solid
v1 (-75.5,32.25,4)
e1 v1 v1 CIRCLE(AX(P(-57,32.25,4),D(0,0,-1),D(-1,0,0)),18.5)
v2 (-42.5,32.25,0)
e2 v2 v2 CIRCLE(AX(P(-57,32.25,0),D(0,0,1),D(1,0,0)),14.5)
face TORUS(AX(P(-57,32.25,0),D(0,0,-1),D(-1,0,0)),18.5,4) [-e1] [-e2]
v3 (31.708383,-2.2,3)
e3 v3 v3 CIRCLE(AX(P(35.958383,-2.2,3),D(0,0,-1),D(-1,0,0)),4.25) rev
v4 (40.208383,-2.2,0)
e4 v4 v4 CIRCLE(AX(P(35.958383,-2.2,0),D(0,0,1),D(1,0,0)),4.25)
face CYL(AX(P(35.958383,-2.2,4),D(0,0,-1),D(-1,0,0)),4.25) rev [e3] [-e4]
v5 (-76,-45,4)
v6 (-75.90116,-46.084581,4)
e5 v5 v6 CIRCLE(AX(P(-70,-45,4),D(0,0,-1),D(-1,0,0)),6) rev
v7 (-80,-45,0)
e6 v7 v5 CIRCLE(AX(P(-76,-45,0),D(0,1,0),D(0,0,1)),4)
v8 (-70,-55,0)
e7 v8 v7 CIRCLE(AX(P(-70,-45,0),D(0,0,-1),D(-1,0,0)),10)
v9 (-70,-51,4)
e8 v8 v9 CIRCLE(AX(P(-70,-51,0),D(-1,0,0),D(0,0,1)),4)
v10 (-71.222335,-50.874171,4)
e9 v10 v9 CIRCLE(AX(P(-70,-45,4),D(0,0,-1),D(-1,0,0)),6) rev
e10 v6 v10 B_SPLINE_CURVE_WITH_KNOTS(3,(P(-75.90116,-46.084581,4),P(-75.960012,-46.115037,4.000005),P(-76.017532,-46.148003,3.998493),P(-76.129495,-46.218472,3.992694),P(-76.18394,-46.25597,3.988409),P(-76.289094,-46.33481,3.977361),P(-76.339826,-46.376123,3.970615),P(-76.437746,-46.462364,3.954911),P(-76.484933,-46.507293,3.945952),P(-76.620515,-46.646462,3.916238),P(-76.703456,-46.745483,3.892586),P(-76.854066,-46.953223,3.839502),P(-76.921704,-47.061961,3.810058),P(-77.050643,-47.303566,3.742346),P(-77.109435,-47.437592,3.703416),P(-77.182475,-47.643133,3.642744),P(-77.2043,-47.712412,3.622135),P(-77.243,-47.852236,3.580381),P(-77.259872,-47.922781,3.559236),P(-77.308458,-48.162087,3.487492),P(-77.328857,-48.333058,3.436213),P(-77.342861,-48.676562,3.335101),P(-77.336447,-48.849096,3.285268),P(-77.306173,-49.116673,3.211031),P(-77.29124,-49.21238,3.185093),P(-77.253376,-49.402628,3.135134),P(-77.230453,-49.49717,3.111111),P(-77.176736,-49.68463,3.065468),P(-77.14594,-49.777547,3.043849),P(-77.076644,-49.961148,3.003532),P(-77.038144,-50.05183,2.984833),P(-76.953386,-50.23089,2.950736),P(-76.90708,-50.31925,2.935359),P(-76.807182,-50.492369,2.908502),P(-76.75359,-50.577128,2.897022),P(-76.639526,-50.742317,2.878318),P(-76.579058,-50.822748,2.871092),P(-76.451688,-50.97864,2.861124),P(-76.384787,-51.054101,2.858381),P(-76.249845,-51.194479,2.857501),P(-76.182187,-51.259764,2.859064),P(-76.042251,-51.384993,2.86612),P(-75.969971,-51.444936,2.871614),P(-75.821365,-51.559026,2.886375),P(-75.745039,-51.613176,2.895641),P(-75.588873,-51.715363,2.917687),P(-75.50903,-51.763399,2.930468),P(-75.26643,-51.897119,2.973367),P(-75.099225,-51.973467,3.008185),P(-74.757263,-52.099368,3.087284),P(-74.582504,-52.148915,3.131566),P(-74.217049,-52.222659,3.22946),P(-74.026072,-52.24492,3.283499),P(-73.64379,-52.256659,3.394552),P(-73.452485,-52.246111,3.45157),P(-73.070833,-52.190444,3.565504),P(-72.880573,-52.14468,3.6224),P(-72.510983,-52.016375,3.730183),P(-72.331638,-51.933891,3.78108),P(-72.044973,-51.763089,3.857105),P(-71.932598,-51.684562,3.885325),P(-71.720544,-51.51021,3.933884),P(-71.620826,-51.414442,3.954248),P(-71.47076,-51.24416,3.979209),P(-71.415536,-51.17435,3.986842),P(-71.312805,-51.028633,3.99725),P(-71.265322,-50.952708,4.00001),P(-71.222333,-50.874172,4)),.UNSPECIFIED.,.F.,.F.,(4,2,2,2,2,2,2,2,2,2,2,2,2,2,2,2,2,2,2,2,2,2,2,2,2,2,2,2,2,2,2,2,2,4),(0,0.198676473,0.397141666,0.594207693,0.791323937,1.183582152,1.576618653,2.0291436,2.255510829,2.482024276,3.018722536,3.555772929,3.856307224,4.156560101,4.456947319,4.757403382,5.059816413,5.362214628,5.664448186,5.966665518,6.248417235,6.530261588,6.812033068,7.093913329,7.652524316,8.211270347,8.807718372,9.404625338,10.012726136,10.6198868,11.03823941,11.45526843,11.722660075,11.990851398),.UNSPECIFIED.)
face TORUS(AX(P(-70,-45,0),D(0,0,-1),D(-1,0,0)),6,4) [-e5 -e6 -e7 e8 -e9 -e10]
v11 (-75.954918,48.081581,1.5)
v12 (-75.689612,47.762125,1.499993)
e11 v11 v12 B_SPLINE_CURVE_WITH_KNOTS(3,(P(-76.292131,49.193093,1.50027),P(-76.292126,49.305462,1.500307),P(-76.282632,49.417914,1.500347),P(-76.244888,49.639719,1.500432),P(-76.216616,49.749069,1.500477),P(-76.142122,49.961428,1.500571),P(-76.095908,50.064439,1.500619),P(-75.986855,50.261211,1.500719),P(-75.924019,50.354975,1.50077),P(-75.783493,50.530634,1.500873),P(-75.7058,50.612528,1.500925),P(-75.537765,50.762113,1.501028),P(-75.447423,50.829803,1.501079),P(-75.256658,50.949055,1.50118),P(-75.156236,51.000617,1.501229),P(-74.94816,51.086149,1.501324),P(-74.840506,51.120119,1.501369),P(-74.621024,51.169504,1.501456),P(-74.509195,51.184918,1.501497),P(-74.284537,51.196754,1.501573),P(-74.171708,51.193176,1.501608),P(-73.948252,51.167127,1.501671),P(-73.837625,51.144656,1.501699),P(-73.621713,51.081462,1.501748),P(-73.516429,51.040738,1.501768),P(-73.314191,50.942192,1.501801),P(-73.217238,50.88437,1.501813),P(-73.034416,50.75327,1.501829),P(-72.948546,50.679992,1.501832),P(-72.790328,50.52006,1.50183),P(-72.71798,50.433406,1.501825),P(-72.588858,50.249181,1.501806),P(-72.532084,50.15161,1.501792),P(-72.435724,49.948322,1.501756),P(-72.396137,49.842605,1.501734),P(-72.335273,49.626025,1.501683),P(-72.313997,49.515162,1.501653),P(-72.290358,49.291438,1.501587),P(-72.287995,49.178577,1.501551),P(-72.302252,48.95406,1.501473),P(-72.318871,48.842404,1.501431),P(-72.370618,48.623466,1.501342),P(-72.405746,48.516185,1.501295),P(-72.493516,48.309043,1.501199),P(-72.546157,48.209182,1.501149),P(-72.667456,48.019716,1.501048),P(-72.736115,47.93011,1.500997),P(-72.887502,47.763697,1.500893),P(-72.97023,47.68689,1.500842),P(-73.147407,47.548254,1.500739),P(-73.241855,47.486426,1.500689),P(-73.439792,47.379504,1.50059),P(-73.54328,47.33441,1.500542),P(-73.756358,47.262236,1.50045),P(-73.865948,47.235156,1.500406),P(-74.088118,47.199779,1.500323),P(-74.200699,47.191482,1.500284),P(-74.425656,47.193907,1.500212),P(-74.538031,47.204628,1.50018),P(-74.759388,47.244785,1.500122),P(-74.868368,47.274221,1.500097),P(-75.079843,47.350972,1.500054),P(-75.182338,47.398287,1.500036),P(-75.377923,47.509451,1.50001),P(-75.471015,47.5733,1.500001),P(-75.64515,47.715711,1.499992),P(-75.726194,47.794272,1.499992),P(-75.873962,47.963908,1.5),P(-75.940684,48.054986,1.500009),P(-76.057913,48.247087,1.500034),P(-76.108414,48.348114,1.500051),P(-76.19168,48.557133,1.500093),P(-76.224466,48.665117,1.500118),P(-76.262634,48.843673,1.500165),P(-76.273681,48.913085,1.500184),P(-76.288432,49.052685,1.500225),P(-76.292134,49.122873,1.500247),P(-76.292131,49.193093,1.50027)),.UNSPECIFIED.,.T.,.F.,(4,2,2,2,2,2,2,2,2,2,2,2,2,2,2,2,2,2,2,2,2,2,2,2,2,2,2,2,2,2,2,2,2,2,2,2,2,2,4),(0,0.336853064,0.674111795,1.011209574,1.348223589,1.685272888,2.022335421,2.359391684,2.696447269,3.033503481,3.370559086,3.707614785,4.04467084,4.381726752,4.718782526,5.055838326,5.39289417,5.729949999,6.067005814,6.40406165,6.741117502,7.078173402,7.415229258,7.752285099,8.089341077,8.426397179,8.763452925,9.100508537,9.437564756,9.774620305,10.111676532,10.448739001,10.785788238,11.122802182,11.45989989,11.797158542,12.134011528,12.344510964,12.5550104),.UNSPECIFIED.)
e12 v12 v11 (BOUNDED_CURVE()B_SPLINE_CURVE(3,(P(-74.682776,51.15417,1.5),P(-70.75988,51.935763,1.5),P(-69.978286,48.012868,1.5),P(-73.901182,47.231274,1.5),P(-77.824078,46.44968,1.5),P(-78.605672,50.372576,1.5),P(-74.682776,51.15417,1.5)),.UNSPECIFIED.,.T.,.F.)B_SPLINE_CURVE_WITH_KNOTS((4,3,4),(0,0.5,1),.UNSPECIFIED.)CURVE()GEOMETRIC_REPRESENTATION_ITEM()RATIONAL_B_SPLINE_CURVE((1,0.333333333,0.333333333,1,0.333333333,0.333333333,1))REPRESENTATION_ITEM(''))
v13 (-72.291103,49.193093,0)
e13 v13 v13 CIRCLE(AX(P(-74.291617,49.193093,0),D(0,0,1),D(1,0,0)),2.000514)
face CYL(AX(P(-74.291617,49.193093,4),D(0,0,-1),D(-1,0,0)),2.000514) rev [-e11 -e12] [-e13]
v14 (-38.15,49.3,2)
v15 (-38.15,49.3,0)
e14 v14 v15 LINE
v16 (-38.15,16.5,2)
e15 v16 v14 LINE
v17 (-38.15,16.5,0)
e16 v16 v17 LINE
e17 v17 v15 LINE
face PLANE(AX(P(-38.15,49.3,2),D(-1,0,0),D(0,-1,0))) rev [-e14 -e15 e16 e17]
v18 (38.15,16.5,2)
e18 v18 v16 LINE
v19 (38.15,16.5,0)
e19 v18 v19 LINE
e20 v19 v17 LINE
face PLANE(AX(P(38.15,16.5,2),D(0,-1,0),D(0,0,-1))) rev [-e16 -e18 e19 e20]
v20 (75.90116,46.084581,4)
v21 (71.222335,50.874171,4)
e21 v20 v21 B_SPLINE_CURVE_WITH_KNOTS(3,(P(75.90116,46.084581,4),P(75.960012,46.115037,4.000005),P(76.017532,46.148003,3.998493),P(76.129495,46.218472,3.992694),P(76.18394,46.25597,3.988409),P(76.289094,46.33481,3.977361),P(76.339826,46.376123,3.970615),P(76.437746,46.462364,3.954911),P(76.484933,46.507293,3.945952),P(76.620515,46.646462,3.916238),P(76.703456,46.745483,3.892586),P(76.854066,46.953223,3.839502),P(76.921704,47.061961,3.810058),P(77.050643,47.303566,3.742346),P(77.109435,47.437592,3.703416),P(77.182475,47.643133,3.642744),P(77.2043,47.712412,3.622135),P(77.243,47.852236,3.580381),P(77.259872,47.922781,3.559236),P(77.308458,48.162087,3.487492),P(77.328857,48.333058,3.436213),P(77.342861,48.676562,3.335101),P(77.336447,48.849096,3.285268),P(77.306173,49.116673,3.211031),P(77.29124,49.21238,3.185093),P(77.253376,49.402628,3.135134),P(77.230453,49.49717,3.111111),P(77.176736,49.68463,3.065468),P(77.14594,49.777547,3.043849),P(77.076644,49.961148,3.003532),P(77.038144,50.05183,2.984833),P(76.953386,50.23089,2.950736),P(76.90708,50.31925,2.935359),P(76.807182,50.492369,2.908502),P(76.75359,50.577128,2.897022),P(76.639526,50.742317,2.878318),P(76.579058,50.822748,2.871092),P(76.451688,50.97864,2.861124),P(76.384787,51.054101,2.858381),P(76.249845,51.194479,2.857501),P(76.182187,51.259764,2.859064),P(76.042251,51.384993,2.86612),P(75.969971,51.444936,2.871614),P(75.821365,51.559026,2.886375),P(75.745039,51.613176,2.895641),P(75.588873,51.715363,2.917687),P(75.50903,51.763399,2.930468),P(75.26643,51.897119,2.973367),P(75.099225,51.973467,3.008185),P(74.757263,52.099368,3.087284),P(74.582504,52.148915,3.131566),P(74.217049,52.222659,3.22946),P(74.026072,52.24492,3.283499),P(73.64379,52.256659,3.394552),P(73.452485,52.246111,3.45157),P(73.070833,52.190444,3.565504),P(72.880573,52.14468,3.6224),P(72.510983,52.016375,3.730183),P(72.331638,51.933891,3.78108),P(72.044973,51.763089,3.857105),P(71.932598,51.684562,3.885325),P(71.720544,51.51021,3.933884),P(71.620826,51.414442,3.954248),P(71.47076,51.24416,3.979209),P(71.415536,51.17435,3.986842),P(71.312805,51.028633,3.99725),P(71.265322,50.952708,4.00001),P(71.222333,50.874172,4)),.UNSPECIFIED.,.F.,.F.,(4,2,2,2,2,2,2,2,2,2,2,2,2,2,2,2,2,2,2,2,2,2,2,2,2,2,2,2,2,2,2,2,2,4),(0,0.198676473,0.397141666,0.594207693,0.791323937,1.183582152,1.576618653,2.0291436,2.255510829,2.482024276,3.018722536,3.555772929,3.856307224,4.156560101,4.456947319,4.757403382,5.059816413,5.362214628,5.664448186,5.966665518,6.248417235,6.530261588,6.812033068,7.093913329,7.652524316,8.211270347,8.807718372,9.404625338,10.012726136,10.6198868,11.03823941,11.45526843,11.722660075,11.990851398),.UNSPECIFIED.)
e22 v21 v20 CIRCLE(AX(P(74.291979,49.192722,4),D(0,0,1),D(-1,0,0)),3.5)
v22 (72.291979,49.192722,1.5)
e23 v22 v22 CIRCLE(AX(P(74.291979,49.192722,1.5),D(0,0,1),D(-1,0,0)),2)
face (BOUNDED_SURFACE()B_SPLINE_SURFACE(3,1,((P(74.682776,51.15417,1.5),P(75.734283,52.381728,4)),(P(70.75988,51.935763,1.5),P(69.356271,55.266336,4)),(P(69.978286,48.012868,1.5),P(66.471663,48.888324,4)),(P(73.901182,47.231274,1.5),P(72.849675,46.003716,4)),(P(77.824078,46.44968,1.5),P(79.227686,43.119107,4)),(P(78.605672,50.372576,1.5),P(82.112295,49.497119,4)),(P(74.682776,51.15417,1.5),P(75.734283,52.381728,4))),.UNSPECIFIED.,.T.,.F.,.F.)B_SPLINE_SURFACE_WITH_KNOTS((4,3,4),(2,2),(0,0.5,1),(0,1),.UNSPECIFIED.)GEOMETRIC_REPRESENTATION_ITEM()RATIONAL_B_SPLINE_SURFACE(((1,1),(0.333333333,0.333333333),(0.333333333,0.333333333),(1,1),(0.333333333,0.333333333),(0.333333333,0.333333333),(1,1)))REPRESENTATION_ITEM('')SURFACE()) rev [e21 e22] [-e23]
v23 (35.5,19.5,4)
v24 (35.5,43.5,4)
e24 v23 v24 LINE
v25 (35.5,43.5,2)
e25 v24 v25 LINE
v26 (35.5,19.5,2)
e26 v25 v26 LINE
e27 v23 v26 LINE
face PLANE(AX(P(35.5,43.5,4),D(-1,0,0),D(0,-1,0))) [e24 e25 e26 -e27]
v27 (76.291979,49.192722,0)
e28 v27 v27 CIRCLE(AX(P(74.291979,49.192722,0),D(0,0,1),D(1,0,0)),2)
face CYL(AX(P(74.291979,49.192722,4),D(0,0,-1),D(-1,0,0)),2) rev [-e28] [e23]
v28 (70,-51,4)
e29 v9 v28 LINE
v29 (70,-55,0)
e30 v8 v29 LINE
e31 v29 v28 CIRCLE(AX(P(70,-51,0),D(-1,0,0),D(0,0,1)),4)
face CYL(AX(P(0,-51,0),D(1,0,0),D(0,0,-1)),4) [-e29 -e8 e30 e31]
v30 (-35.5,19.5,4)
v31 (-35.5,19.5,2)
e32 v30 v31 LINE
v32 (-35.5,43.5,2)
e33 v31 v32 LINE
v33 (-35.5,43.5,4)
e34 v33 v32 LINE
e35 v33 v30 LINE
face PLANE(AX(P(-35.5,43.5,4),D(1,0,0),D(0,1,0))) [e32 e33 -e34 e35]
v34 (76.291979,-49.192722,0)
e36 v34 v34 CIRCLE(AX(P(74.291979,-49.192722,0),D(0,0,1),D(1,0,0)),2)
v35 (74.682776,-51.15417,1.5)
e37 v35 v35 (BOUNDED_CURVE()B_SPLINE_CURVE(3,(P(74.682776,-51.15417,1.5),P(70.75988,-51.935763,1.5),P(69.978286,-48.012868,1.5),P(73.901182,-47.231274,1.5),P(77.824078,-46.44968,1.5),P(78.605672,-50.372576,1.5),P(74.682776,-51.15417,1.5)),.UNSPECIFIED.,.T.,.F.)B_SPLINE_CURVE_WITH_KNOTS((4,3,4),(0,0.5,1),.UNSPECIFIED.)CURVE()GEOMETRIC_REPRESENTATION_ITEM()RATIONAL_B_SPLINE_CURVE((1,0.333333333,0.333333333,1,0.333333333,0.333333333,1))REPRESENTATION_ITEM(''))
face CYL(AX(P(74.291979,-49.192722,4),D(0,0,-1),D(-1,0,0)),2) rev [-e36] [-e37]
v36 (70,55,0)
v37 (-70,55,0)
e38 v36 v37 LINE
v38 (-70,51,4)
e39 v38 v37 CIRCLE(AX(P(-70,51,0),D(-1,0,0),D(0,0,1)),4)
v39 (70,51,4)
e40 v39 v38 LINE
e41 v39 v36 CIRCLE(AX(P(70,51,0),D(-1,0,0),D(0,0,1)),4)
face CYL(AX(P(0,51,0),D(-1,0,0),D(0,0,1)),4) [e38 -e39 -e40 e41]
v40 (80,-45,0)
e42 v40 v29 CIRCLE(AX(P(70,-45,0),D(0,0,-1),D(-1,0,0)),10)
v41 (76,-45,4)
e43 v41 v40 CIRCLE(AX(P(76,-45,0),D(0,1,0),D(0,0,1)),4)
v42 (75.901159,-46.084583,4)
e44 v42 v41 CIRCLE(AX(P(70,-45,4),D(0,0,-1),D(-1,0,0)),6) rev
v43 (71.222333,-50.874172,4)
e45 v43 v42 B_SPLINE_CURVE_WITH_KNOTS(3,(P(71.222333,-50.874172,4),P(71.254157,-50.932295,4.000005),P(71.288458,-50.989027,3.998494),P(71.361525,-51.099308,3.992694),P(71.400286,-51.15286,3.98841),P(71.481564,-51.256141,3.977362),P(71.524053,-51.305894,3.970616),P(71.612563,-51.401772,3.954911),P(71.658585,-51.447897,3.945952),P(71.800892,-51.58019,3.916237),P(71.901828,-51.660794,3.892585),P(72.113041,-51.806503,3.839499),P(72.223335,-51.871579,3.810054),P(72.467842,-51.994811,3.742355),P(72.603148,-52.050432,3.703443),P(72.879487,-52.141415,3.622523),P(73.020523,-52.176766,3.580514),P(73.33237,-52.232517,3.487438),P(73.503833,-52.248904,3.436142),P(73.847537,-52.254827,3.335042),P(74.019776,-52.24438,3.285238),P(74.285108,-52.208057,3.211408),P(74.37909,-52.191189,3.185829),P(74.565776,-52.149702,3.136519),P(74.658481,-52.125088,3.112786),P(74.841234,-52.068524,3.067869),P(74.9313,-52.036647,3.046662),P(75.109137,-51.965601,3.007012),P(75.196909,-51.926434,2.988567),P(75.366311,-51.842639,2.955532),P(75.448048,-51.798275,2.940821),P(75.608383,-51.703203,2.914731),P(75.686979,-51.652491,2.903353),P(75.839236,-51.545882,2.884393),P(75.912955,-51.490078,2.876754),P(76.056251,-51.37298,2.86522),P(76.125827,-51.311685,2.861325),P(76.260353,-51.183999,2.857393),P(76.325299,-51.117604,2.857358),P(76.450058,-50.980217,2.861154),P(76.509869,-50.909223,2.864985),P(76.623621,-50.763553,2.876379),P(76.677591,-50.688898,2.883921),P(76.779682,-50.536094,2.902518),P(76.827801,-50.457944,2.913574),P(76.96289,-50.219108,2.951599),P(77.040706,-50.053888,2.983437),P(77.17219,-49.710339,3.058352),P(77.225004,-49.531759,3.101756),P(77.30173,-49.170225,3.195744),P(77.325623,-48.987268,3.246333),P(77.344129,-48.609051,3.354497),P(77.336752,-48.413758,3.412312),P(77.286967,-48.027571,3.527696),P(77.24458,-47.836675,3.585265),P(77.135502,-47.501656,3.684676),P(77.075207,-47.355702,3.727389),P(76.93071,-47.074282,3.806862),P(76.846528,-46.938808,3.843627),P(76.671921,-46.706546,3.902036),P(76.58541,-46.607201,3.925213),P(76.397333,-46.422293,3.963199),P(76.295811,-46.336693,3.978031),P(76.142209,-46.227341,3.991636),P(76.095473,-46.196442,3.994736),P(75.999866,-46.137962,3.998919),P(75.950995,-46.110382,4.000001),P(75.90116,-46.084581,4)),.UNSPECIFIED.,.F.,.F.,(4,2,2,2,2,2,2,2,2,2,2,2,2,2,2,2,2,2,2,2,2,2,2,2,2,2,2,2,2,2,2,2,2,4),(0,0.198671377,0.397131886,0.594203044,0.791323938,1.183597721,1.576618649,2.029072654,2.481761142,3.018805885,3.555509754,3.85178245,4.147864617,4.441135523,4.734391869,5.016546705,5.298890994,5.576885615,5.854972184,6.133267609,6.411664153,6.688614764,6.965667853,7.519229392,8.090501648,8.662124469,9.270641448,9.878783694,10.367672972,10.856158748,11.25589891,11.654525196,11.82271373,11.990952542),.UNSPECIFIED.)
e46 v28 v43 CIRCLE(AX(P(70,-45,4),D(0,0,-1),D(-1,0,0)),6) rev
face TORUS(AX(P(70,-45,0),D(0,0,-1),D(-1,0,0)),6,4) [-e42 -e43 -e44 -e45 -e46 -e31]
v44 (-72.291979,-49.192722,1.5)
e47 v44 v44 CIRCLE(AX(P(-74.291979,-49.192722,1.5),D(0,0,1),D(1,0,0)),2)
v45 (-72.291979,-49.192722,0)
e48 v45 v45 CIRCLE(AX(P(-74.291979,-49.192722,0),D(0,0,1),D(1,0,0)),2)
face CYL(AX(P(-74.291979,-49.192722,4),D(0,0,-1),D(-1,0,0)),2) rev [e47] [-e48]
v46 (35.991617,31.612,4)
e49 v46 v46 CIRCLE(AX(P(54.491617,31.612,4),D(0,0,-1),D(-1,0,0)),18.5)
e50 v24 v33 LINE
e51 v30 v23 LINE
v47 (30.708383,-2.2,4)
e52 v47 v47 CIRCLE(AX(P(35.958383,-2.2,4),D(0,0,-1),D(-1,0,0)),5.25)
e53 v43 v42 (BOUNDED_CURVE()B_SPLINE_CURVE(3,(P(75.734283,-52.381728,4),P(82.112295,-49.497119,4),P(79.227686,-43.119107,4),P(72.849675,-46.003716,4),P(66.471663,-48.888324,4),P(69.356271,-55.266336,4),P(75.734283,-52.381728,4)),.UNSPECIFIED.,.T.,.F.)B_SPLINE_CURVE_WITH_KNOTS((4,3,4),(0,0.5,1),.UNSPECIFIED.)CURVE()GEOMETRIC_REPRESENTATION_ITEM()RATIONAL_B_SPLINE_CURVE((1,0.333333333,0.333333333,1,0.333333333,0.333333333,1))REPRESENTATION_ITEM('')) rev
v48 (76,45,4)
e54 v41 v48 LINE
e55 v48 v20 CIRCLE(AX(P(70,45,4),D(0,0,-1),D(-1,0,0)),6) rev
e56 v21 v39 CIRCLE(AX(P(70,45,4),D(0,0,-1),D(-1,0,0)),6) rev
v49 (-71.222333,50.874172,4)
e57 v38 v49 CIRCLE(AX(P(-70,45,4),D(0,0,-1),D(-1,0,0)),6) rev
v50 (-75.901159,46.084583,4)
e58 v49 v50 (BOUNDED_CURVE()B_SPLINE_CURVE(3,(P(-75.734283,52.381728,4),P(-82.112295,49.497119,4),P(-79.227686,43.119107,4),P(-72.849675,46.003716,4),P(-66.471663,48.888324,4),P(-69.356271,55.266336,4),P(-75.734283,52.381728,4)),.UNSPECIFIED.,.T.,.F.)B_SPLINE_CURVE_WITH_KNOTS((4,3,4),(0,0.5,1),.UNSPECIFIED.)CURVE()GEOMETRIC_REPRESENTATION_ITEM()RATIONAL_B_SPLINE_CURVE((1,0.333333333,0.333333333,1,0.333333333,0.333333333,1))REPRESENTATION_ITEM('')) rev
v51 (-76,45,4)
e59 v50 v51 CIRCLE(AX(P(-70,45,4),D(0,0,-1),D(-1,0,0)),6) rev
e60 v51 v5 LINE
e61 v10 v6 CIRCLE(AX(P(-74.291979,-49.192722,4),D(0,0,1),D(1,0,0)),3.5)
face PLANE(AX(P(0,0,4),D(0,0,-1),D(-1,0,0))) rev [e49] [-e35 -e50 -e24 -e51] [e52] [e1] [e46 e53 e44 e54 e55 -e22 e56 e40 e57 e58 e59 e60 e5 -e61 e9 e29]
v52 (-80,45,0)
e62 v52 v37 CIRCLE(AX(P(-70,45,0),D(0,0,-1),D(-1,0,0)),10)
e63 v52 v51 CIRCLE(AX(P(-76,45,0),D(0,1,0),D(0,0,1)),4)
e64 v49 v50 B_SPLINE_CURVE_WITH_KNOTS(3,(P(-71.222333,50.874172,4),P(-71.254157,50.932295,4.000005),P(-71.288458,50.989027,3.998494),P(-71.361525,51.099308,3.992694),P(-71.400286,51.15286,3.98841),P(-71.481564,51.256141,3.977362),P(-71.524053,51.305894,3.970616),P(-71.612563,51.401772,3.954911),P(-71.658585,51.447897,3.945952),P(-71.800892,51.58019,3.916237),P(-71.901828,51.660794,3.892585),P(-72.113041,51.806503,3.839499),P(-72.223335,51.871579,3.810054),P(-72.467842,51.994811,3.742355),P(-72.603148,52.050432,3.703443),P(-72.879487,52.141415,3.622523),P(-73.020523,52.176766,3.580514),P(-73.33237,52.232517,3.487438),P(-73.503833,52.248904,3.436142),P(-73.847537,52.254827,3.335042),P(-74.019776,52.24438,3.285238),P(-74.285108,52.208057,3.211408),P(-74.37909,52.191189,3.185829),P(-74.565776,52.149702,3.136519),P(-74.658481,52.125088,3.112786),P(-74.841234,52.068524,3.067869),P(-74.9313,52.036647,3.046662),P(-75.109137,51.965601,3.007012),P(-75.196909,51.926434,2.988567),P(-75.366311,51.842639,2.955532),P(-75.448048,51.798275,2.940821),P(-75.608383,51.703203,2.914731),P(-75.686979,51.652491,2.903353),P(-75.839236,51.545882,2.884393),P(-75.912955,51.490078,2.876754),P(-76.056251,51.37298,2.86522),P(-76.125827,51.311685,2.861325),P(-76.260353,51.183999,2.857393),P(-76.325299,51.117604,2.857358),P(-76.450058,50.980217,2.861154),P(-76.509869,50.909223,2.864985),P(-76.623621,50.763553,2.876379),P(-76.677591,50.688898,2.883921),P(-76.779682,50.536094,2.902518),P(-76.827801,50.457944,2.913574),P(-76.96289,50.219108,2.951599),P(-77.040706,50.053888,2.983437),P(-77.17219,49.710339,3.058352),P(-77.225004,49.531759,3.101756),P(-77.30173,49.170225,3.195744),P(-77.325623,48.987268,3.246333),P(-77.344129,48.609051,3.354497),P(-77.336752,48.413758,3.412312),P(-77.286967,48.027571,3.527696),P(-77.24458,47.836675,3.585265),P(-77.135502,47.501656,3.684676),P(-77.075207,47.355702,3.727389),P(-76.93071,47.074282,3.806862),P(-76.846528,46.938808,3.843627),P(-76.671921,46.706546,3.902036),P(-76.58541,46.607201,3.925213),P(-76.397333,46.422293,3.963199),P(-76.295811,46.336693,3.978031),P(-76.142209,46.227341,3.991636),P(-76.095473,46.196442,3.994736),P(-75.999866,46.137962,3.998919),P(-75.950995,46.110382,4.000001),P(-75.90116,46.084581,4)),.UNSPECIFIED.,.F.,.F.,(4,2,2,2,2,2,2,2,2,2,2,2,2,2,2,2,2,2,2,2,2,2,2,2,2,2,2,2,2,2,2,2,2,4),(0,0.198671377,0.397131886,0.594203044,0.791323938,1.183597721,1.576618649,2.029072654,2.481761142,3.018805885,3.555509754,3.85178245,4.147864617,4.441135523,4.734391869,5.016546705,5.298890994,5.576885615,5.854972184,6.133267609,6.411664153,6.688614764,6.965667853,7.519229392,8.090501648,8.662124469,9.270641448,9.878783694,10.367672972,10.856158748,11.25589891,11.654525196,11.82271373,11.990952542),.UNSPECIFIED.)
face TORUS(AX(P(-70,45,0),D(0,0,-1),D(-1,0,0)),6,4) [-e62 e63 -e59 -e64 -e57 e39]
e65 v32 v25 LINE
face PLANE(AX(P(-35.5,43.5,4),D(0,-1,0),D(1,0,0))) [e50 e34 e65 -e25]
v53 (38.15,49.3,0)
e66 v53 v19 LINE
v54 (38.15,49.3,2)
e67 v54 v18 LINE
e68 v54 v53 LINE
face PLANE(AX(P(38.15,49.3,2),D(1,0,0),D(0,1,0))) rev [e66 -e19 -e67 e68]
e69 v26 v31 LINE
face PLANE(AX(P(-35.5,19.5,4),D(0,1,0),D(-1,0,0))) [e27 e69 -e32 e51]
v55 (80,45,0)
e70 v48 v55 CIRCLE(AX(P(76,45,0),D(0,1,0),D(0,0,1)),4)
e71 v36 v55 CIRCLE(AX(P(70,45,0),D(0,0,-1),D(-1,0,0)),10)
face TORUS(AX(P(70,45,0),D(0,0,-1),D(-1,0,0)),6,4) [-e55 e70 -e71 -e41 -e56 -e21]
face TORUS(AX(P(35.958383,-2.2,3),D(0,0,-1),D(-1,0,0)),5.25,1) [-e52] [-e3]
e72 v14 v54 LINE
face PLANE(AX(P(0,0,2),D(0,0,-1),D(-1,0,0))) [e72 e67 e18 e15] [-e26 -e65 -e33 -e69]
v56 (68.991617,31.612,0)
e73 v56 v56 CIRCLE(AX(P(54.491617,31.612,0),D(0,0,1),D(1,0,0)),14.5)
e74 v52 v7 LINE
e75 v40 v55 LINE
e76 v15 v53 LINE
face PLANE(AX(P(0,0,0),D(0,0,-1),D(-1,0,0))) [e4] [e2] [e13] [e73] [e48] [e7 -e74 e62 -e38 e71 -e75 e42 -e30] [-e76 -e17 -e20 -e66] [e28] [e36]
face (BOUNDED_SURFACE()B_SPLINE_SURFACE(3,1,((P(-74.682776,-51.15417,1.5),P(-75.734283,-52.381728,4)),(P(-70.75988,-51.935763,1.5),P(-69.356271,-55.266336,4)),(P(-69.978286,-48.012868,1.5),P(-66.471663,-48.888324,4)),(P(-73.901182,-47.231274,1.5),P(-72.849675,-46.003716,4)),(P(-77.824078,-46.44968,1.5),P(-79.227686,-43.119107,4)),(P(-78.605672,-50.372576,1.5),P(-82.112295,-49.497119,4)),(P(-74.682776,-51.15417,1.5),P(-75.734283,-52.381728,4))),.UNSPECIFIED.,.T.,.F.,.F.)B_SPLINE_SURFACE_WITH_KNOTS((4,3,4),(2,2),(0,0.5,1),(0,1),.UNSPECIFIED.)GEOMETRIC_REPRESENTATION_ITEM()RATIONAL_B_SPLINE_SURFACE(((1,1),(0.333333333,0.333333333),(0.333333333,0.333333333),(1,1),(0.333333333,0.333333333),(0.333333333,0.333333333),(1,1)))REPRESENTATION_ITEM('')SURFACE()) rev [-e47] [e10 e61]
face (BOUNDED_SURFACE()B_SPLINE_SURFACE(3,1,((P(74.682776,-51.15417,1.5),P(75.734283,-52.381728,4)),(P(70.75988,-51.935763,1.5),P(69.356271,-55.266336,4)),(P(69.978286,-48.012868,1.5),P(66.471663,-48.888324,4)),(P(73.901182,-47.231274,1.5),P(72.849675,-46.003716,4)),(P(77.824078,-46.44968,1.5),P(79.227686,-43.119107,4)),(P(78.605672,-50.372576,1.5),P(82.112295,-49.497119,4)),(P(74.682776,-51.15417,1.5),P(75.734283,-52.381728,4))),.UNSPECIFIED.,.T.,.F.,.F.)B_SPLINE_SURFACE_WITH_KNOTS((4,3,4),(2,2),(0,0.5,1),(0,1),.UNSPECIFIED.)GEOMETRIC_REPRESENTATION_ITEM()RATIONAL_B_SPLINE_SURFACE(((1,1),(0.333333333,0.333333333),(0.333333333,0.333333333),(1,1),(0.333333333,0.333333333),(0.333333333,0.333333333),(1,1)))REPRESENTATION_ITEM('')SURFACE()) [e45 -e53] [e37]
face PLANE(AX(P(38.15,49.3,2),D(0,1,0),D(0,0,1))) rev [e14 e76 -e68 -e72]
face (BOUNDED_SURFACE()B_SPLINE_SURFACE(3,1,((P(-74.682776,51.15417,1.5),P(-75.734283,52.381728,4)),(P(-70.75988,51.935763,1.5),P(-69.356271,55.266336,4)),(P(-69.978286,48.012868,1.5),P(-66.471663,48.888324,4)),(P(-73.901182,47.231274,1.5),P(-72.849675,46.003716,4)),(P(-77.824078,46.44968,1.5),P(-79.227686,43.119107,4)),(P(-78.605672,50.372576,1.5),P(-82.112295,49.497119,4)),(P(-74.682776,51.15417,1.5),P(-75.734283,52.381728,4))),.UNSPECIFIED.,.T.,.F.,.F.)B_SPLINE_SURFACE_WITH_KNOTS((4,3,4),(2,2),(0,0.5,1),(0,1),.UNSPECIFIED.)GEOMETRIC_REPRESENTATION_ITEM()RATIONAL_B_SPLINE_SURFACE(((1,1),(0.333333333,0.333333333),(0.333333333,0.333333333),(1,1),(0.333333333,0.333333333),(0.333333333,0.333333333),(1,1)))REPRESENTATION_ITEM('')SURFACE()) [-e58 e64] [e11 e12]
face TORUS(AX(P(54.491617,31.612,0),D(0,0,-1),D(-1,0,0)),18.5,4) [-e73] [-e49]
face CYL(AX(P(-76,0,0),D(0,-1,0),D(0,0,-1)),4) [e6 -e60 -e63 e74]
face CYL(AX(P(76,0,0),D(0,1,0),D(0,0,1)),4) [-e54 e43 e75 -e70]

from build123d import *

# Parameters (mm, degrees)
IZIM1_W                     = 160
IZIM1_H                     = 110
IZIM1_R                     = 14.5
IZIM1_R_2                   = 4.25
IZIM1_R_3                   = 2
IZIM1_R_4                   = 2.000514333
IZIM1_W_2                   = 71
IZIM1_H_2                   = 24
Y_KSEKLIK_EKSTR_ZYON1_DEPTH = 4
RADYUS1_R                   = 10
RADYUS2_R                   = 4
IZIM2_W                     = 76.3
IZIM2_H                     = 32.8
KES_EKSTR_ZYON1_DEPTH       = 2
RADYUS3_R                   = 4
RADYUS4_R                   = 1


with BuildPart() as part:
    # Çizim1 → Yükseklik-Ekstrüzyon1 (new body)
    with BuildSketch(Plane.XY):
        Rectangle(IZIM1_W, IZIM1_H)
        with Locations((-57, 32.25)):
            Circle(IZIM1_R, mode=Mode.SUBTRACT)
        with Locations((54.491616853, 31.612)):
            Circle(IZIM1_R, mode=Mode.SUBTRACT)
        with Locations((35.958383147, -2.2)):
            Circle(IZIM1_R_2, mode=Mode.SUBTRACT)
        with Locations((-74.291978978, -49.192721843)):
            Circle(IZIM1_R_3, mode=Mode.SUBTRACT)
        with Locations((-74.291616853, 49.193092508)):
            Circle(IZIM1_R_4, mode=Mode.SUBTRACT)
        with Locations((74.291978978, 49.192721843)):
            Circle(IZIM1_R_3, mode=Mode.SUBTRACT)
        with Locations((74.291978978, -49.192721843)):
            Circle(IZIM1_R_3, mode=Mode.SUBTRACT)
        with Locations((0, 31.5)):
            Rectangle(IZIM1_W_2, IZIM1_H_2, mode=Mode.SUBTRACT)
    extrude(amount=Y_KSEKLIK_EKSTR_ZYON1_DEPTH)

    # Radyus1
    radyus1_edges = [part.edges().sort_by_distance(p)[0] for p in [
        (80, -55, 2),
        (-80, -55, 2),
        (-80, 55, 2),
        (80, 55, 2),
    ]]
    fillet(radyus1_edges, radius=RADYUS1_R)

    # Radyus2
    radyus2_edges = [part.edges().sort_by_distance(p)[0] for p in [
        (-71.5, 32.25, 4),
        (39.991616853, 31.612, 4),
    ]]
    fillet(radyus2_edges, radius=RADYUS2_R - 0.0001)  # a hair under: the kernel refuses the full size

    # Çizim2 → Kes-Ekstrüzyon1 (cut)
    with BuildSketch(Plane(origin=(0, 0, 0), x_dir=(-1, 0, 0), z_dir=(0, 0, -1))):
        with Locations((0, 32.9)):
            Rectangle(IZIM2_W, IZIM2_H)
    extrude(amount=-KES_EKSTR_ZYON1_DEPTH, mode=Mode.SUBTRACT)

    # Radyus3
    # the kernel refuses this fillet: 4 mm, written as the material it takes off along each edge
    with BuildSketch(Plane(origin=(-70, 45, 4), x_dir=(0, 1, 0), z_dir=(1, 0, 0))) as radyus3_piece_1:
        with BuildLine():
            CenterArc((10 - RADYUS3_R, -RADYUS3_R), RADYUS3_R, 0, 90)
            Line((10, -RADYUS3_R), (10, 0))
            Line((10, 0), (10 - RADYUS3_R, 0))
        make_face()
    revolve(axis=Axis((-70, 45, 4), (0, 0, 1)), revolution_arc=90, mode=Mode.SUBTRACT)
    with BuildSketch(Plane(origin=(70, 55, 4), x_dir=(0, -1, 0), z_dir=(-1, 0, 0)), Plane(origin=(-70, -55, 4), x_dir=(0, 1, 0), z_dir=(1, 0, 0))) as radyus3_piece_2:
        with BuildLine():
            CenterArc((RADYUS3_R, -RADYUS3_R), RADYUS3_R, 90, 90)
            Line((0, -RADYUS3_R), (0, 0))
            Line((0, 0), (RADYUS3_R, 0))
        make_face()
    extrude(amount=140, mode=Mode.SUBTRACT)
    with BuildSketch(Plane(origin=(70, 45, 4), x_dir=(1, 0, 0), z_dir=(0, -1, 0))) as radyus3_piece_3:
        with BuildLine():
            CenterArc((10 - RADYUS3_R, -RADYUS3_R), RADYUS3_R, 0, 90)
            Line((10, -RADYUS3_R), (10, 0))
            Line((10, 0), (10 - RADYUS3_R, 0))
        make_face()
    revolve(axis=Axis((70, 45, 4), (0, 0, 1)), revolution_arc=90, mode=Mode.SUBTRACT)
    with BuildSketch(Plane(origin=(80, -45, 4), x_dir=(-1, 0, 0), z_dir=(0, 1, 0)), Plane(origin=(-80, 45, 4), x_dir=(1, 0, 0), z_dir=(0, -1, 0))) as radyus3_piece_4:
        with BuildLine():
            CenterArc((RADYUS3_R, -RADYUS3_R), RADYUS3_R, 90, 90)
            Line((0, -RADYUS3_R), (0, 0))
            Line((0, 0), (RADYUS3_R, 0))
        make_face()
    extrude(amount=90, mode=Mode.SUBTRACT)
    with BuildSketch(Plane(origin=(70, -45, 4), x_dir=(0, -1, 0), z_dir=(-1, 0, 0))) as radyus3_piece_5:
        with BuildLine():
            CenterArc((10 - RADYUS3_R, -RADYUS3_R), RADYUS3_R, 0, 90)
            Line((10, -RADYUS3_R), (10, 0))
            Line((10, 0), (10 - RADYUS3_R, 0))
        make_face()
    revolve(axis=Axis((70, -45, 4), (0, 0, 1)), revolution_arc=90, mode=Mode.SUBTRACT)
    with BuildSketch(Plane(origin=(-70, -45, 4), x_dir=(0, -1, 0), z_dir=(1, 0, 0))) as radyus3_piece_6:
        with BuildLine():
            CenterArc((10 - RADYUS3_R, RADYUS3_R), RADYUS3_R, 270, 90)
            Line((10, RADYUS3_R), (10, 0))
            Line((10, 0), (10 - RADYUS3_R, 0))
        make_face()
    revolve(axis=Axis((-70, -45, 4), (0, 0, -1)), revolution_arc=90, mode=Mode.SUBTRACT)

    # Kes-Loft1: read off the stored shape, not the designer's step
    # Kes-Loft1: loft between two sections, ruled curve by curve
    kes_loft1_from = [
        Edge.make_bspline([(-74.682775848, -51.154169728, 1.5), (-70.759880078, -51.935763469, 1.5), (-69.978286337, -48.012867699, 1.5), (-73.901182107, -47.231273958, 1.5), (-77.824077878, -46.449680217, 1.5), (-78.605671618, -50.372575988, 1.5), (-74.682775848, -51.154169728, 1.5)], [0, 0, 0, 0, 0.5, 0.5, 0.5, 1, 1, 1, 1], 3, [1, 0.333333333, 0.333333333, 1, 0.333333333, 0.333333333, 1]),
    ]
    kes_loft1_to = [
        Edge.make_bspline([(-75.734283229, -52.381727715, 4), (-69.356271486, -55.266336217, 4), (-66.471662984, -48.888324474, 4), (-72.849674727, -46.003715972, 4), (-79.227686469, -43.11910747, 4), (-82.112294971, -49.497119212, 4), (-75.734283229, -52.381727715, 4)], [0, 0, 0, 0, 0.5, 0.5, 0.5, 1, 1, 1, 1], 3, [1, 0.333333333, 0.333333333, 1, 0.333333333, 0.333333333, 1]),
    ]
    kes_loft1 = Solid(Shell([*[Face.make_surface_from_curves(kes_loft1_from[k], kes_loft1_to[k]) for k in range(1)], Face(Wire(kes_loft1_from)), Face(Wire(kes_loft1_to))]))
    add(kes_loft1, mode=Mode.SUBTRACT)

    # Aynalama1: read off the stored shape, not the designer's step
    # Aynalama1: loft between two sections, ruled curve by curve
    aynalama1_from = [
        Edge.make_bspline([(74.682775848, -51.154169728, 1.5), (70.759880078, -51.935763469, 1.5), (69.978286337, -48.012867699, 1.5), (73.901182107, -47.231273958, 1.5), (77.824077878, -46.449680217, 1.5), (78.605671618, -50.372575988, 1.5), (74.682775848, -51.154169728, 1.5)], [0, 0, 0, 0, 0.5, 0.5, 0.5, 1, 1, 1, 1], 3, [1, 0.333333333, 0.333333333, 1, 0.333333333, 0.333333333, 1]),
    ]
    aynalama1_to = [
        Edge.make_bspline([(75.734283229, -52.381727715, 4), (69.356271486, -55.266336217, 4), (66.471662984, -48.888324474, 4), (72.849674727, -46.003715972, 4), (79.227686469, -43.11910747, 4), (82.112294971, -49.497119212, 4), (75.734283229, -52.381727715, 4)], [0, 0, 0, 0, 0.5, 0.5, 0.5, 1, 1, 1, 1], 3, [1, 0.333333333, 0.333333333, 1, 0.333333333, 0.333333333, 1]),
    ]
    aynalama1 = Solid(Shell([*[Face.make_surface_from_curves(aynalama1_from[k], aynalama1_to[k]) for k in range(1)], Face(Wire(aynalama1_from)), Face(Wire(aynalama1_to))]))
    add(aynalama1, mode=Mode.SUBTRACT)

    # Aynalama1 2: loft between two sections, ruled curve by curve
    aynalama1_2_from = [
        Edge.make_bspline([(-74.682775848, 51.154169728, 1.5), (-70.759880078, 51.935763469, 1.5), (-69.978286337, 48.012867699, 1.5), (-73.901182107, 47.231273958, 1.5), (-77.824077878, 46.449680217, 1.5), (-78.605671618, 50.372575988, 1.5), (-74.682775848, 51.154169728, 1.5)], [0, 0, 0, 0, 0.5, 0.5, 0.5, 1, 1, 1, 1], 3, [1, 0.333333333, 0.333333333, 1, 0.333333333, 0.333333333, 1]),
    ]
    aynalama1_2_to = [
        Edge.make_bspline([(-75.734283229, 52.381727715, 4), (-69.356271486, 55.266336217, 4), (-66.471662984, 48.888324474, 4), (-72.849674727, 46.003715972, 4), (-79.227686469, 43.11910747, 4), (-82.112294971, 49.497119212, 4), (-75.734283229, 52.381727715, 4)], [0, 0, 0, 0, 0.5, 0.5, 0.5, 1, 1, 1, 1], 3, [1, 0.333333333, 0.333333333, 1, 0.333333333, 0.333333333, 1]),
    ]
    aynalama1_2 = Solid(Shell([*[Face.make_surface_from_curves(aynalama1_2_from[k], aynalama1_2_to[k]) for k in range(1)], Face(Wire(aynalama1_2_from)), Face(Wire(aynalama1_2_to))]))
    add(aynalama1_2, mode=Mode.SUBTRACT)

    # Aynalama1 3: loft between two sections, ruled curve by curve
    aynalama1_3_from = [
        Edge.make_bspline([(74.682775848, 51.154169728, 1.5), (70.759880078, 51.935763469, 1.5), (69.978286337, 48.012867699, 1.5), (73.901182107, 47.231273958, 1.5), (77.824077878, 46.449680217, 1.5), (78.605671618, 50.372575988, 1.5), (74.682775848, 51.154169728, 1.5)], [0, 0, 0, 0, 0.5, 0.5, 0.5, 1, 1, 1, 1], 3, [1, 0.333333333, 0.333333333, 1, 0.333333333, 0.333333333, 1]),
    ]
    aynalama1_3_to = [
        Edge.make_bspline([(75.734283229, 52.381727715, 4), (69.356271486, 55.266336217, 4), (66.471662984, 48.888324474, 4), (72.849674727, 46.003715972, 4), (79.227686469, 43.11910747, 4), (82.112294971, 49.497119212, 4), (75.734283229, 52.381727715, 4)], [0, 0, 0, 0, 0.5, 0.5, 0.5, 1, 1, 1, 1], 3, [1, 0.333333333, 0.333333333, 1, 0.333333333, 0.333333333, 1]),
    ]
    aynalama1_3 = Solid(Shell([*[Face.make_surface_from_curves(aynalama1_3_from[k], aynalama1_3_to[k]) for k in range(1)], Face(Wire(aynalama1_3_from)), Face(Wire(aynalama1_3_to))]))
    add(aynalama1_3, mode=Mode.SUBTRACT)

    # Radyus4
    radyus4_edges = [part.edges().sort_by_distance(p)[0] for p in [
        (31.708383147, -2.2, 4),
    ]]
    fillet(radyus4_edges, radius=RADYUS4_R)


solid = part.part
